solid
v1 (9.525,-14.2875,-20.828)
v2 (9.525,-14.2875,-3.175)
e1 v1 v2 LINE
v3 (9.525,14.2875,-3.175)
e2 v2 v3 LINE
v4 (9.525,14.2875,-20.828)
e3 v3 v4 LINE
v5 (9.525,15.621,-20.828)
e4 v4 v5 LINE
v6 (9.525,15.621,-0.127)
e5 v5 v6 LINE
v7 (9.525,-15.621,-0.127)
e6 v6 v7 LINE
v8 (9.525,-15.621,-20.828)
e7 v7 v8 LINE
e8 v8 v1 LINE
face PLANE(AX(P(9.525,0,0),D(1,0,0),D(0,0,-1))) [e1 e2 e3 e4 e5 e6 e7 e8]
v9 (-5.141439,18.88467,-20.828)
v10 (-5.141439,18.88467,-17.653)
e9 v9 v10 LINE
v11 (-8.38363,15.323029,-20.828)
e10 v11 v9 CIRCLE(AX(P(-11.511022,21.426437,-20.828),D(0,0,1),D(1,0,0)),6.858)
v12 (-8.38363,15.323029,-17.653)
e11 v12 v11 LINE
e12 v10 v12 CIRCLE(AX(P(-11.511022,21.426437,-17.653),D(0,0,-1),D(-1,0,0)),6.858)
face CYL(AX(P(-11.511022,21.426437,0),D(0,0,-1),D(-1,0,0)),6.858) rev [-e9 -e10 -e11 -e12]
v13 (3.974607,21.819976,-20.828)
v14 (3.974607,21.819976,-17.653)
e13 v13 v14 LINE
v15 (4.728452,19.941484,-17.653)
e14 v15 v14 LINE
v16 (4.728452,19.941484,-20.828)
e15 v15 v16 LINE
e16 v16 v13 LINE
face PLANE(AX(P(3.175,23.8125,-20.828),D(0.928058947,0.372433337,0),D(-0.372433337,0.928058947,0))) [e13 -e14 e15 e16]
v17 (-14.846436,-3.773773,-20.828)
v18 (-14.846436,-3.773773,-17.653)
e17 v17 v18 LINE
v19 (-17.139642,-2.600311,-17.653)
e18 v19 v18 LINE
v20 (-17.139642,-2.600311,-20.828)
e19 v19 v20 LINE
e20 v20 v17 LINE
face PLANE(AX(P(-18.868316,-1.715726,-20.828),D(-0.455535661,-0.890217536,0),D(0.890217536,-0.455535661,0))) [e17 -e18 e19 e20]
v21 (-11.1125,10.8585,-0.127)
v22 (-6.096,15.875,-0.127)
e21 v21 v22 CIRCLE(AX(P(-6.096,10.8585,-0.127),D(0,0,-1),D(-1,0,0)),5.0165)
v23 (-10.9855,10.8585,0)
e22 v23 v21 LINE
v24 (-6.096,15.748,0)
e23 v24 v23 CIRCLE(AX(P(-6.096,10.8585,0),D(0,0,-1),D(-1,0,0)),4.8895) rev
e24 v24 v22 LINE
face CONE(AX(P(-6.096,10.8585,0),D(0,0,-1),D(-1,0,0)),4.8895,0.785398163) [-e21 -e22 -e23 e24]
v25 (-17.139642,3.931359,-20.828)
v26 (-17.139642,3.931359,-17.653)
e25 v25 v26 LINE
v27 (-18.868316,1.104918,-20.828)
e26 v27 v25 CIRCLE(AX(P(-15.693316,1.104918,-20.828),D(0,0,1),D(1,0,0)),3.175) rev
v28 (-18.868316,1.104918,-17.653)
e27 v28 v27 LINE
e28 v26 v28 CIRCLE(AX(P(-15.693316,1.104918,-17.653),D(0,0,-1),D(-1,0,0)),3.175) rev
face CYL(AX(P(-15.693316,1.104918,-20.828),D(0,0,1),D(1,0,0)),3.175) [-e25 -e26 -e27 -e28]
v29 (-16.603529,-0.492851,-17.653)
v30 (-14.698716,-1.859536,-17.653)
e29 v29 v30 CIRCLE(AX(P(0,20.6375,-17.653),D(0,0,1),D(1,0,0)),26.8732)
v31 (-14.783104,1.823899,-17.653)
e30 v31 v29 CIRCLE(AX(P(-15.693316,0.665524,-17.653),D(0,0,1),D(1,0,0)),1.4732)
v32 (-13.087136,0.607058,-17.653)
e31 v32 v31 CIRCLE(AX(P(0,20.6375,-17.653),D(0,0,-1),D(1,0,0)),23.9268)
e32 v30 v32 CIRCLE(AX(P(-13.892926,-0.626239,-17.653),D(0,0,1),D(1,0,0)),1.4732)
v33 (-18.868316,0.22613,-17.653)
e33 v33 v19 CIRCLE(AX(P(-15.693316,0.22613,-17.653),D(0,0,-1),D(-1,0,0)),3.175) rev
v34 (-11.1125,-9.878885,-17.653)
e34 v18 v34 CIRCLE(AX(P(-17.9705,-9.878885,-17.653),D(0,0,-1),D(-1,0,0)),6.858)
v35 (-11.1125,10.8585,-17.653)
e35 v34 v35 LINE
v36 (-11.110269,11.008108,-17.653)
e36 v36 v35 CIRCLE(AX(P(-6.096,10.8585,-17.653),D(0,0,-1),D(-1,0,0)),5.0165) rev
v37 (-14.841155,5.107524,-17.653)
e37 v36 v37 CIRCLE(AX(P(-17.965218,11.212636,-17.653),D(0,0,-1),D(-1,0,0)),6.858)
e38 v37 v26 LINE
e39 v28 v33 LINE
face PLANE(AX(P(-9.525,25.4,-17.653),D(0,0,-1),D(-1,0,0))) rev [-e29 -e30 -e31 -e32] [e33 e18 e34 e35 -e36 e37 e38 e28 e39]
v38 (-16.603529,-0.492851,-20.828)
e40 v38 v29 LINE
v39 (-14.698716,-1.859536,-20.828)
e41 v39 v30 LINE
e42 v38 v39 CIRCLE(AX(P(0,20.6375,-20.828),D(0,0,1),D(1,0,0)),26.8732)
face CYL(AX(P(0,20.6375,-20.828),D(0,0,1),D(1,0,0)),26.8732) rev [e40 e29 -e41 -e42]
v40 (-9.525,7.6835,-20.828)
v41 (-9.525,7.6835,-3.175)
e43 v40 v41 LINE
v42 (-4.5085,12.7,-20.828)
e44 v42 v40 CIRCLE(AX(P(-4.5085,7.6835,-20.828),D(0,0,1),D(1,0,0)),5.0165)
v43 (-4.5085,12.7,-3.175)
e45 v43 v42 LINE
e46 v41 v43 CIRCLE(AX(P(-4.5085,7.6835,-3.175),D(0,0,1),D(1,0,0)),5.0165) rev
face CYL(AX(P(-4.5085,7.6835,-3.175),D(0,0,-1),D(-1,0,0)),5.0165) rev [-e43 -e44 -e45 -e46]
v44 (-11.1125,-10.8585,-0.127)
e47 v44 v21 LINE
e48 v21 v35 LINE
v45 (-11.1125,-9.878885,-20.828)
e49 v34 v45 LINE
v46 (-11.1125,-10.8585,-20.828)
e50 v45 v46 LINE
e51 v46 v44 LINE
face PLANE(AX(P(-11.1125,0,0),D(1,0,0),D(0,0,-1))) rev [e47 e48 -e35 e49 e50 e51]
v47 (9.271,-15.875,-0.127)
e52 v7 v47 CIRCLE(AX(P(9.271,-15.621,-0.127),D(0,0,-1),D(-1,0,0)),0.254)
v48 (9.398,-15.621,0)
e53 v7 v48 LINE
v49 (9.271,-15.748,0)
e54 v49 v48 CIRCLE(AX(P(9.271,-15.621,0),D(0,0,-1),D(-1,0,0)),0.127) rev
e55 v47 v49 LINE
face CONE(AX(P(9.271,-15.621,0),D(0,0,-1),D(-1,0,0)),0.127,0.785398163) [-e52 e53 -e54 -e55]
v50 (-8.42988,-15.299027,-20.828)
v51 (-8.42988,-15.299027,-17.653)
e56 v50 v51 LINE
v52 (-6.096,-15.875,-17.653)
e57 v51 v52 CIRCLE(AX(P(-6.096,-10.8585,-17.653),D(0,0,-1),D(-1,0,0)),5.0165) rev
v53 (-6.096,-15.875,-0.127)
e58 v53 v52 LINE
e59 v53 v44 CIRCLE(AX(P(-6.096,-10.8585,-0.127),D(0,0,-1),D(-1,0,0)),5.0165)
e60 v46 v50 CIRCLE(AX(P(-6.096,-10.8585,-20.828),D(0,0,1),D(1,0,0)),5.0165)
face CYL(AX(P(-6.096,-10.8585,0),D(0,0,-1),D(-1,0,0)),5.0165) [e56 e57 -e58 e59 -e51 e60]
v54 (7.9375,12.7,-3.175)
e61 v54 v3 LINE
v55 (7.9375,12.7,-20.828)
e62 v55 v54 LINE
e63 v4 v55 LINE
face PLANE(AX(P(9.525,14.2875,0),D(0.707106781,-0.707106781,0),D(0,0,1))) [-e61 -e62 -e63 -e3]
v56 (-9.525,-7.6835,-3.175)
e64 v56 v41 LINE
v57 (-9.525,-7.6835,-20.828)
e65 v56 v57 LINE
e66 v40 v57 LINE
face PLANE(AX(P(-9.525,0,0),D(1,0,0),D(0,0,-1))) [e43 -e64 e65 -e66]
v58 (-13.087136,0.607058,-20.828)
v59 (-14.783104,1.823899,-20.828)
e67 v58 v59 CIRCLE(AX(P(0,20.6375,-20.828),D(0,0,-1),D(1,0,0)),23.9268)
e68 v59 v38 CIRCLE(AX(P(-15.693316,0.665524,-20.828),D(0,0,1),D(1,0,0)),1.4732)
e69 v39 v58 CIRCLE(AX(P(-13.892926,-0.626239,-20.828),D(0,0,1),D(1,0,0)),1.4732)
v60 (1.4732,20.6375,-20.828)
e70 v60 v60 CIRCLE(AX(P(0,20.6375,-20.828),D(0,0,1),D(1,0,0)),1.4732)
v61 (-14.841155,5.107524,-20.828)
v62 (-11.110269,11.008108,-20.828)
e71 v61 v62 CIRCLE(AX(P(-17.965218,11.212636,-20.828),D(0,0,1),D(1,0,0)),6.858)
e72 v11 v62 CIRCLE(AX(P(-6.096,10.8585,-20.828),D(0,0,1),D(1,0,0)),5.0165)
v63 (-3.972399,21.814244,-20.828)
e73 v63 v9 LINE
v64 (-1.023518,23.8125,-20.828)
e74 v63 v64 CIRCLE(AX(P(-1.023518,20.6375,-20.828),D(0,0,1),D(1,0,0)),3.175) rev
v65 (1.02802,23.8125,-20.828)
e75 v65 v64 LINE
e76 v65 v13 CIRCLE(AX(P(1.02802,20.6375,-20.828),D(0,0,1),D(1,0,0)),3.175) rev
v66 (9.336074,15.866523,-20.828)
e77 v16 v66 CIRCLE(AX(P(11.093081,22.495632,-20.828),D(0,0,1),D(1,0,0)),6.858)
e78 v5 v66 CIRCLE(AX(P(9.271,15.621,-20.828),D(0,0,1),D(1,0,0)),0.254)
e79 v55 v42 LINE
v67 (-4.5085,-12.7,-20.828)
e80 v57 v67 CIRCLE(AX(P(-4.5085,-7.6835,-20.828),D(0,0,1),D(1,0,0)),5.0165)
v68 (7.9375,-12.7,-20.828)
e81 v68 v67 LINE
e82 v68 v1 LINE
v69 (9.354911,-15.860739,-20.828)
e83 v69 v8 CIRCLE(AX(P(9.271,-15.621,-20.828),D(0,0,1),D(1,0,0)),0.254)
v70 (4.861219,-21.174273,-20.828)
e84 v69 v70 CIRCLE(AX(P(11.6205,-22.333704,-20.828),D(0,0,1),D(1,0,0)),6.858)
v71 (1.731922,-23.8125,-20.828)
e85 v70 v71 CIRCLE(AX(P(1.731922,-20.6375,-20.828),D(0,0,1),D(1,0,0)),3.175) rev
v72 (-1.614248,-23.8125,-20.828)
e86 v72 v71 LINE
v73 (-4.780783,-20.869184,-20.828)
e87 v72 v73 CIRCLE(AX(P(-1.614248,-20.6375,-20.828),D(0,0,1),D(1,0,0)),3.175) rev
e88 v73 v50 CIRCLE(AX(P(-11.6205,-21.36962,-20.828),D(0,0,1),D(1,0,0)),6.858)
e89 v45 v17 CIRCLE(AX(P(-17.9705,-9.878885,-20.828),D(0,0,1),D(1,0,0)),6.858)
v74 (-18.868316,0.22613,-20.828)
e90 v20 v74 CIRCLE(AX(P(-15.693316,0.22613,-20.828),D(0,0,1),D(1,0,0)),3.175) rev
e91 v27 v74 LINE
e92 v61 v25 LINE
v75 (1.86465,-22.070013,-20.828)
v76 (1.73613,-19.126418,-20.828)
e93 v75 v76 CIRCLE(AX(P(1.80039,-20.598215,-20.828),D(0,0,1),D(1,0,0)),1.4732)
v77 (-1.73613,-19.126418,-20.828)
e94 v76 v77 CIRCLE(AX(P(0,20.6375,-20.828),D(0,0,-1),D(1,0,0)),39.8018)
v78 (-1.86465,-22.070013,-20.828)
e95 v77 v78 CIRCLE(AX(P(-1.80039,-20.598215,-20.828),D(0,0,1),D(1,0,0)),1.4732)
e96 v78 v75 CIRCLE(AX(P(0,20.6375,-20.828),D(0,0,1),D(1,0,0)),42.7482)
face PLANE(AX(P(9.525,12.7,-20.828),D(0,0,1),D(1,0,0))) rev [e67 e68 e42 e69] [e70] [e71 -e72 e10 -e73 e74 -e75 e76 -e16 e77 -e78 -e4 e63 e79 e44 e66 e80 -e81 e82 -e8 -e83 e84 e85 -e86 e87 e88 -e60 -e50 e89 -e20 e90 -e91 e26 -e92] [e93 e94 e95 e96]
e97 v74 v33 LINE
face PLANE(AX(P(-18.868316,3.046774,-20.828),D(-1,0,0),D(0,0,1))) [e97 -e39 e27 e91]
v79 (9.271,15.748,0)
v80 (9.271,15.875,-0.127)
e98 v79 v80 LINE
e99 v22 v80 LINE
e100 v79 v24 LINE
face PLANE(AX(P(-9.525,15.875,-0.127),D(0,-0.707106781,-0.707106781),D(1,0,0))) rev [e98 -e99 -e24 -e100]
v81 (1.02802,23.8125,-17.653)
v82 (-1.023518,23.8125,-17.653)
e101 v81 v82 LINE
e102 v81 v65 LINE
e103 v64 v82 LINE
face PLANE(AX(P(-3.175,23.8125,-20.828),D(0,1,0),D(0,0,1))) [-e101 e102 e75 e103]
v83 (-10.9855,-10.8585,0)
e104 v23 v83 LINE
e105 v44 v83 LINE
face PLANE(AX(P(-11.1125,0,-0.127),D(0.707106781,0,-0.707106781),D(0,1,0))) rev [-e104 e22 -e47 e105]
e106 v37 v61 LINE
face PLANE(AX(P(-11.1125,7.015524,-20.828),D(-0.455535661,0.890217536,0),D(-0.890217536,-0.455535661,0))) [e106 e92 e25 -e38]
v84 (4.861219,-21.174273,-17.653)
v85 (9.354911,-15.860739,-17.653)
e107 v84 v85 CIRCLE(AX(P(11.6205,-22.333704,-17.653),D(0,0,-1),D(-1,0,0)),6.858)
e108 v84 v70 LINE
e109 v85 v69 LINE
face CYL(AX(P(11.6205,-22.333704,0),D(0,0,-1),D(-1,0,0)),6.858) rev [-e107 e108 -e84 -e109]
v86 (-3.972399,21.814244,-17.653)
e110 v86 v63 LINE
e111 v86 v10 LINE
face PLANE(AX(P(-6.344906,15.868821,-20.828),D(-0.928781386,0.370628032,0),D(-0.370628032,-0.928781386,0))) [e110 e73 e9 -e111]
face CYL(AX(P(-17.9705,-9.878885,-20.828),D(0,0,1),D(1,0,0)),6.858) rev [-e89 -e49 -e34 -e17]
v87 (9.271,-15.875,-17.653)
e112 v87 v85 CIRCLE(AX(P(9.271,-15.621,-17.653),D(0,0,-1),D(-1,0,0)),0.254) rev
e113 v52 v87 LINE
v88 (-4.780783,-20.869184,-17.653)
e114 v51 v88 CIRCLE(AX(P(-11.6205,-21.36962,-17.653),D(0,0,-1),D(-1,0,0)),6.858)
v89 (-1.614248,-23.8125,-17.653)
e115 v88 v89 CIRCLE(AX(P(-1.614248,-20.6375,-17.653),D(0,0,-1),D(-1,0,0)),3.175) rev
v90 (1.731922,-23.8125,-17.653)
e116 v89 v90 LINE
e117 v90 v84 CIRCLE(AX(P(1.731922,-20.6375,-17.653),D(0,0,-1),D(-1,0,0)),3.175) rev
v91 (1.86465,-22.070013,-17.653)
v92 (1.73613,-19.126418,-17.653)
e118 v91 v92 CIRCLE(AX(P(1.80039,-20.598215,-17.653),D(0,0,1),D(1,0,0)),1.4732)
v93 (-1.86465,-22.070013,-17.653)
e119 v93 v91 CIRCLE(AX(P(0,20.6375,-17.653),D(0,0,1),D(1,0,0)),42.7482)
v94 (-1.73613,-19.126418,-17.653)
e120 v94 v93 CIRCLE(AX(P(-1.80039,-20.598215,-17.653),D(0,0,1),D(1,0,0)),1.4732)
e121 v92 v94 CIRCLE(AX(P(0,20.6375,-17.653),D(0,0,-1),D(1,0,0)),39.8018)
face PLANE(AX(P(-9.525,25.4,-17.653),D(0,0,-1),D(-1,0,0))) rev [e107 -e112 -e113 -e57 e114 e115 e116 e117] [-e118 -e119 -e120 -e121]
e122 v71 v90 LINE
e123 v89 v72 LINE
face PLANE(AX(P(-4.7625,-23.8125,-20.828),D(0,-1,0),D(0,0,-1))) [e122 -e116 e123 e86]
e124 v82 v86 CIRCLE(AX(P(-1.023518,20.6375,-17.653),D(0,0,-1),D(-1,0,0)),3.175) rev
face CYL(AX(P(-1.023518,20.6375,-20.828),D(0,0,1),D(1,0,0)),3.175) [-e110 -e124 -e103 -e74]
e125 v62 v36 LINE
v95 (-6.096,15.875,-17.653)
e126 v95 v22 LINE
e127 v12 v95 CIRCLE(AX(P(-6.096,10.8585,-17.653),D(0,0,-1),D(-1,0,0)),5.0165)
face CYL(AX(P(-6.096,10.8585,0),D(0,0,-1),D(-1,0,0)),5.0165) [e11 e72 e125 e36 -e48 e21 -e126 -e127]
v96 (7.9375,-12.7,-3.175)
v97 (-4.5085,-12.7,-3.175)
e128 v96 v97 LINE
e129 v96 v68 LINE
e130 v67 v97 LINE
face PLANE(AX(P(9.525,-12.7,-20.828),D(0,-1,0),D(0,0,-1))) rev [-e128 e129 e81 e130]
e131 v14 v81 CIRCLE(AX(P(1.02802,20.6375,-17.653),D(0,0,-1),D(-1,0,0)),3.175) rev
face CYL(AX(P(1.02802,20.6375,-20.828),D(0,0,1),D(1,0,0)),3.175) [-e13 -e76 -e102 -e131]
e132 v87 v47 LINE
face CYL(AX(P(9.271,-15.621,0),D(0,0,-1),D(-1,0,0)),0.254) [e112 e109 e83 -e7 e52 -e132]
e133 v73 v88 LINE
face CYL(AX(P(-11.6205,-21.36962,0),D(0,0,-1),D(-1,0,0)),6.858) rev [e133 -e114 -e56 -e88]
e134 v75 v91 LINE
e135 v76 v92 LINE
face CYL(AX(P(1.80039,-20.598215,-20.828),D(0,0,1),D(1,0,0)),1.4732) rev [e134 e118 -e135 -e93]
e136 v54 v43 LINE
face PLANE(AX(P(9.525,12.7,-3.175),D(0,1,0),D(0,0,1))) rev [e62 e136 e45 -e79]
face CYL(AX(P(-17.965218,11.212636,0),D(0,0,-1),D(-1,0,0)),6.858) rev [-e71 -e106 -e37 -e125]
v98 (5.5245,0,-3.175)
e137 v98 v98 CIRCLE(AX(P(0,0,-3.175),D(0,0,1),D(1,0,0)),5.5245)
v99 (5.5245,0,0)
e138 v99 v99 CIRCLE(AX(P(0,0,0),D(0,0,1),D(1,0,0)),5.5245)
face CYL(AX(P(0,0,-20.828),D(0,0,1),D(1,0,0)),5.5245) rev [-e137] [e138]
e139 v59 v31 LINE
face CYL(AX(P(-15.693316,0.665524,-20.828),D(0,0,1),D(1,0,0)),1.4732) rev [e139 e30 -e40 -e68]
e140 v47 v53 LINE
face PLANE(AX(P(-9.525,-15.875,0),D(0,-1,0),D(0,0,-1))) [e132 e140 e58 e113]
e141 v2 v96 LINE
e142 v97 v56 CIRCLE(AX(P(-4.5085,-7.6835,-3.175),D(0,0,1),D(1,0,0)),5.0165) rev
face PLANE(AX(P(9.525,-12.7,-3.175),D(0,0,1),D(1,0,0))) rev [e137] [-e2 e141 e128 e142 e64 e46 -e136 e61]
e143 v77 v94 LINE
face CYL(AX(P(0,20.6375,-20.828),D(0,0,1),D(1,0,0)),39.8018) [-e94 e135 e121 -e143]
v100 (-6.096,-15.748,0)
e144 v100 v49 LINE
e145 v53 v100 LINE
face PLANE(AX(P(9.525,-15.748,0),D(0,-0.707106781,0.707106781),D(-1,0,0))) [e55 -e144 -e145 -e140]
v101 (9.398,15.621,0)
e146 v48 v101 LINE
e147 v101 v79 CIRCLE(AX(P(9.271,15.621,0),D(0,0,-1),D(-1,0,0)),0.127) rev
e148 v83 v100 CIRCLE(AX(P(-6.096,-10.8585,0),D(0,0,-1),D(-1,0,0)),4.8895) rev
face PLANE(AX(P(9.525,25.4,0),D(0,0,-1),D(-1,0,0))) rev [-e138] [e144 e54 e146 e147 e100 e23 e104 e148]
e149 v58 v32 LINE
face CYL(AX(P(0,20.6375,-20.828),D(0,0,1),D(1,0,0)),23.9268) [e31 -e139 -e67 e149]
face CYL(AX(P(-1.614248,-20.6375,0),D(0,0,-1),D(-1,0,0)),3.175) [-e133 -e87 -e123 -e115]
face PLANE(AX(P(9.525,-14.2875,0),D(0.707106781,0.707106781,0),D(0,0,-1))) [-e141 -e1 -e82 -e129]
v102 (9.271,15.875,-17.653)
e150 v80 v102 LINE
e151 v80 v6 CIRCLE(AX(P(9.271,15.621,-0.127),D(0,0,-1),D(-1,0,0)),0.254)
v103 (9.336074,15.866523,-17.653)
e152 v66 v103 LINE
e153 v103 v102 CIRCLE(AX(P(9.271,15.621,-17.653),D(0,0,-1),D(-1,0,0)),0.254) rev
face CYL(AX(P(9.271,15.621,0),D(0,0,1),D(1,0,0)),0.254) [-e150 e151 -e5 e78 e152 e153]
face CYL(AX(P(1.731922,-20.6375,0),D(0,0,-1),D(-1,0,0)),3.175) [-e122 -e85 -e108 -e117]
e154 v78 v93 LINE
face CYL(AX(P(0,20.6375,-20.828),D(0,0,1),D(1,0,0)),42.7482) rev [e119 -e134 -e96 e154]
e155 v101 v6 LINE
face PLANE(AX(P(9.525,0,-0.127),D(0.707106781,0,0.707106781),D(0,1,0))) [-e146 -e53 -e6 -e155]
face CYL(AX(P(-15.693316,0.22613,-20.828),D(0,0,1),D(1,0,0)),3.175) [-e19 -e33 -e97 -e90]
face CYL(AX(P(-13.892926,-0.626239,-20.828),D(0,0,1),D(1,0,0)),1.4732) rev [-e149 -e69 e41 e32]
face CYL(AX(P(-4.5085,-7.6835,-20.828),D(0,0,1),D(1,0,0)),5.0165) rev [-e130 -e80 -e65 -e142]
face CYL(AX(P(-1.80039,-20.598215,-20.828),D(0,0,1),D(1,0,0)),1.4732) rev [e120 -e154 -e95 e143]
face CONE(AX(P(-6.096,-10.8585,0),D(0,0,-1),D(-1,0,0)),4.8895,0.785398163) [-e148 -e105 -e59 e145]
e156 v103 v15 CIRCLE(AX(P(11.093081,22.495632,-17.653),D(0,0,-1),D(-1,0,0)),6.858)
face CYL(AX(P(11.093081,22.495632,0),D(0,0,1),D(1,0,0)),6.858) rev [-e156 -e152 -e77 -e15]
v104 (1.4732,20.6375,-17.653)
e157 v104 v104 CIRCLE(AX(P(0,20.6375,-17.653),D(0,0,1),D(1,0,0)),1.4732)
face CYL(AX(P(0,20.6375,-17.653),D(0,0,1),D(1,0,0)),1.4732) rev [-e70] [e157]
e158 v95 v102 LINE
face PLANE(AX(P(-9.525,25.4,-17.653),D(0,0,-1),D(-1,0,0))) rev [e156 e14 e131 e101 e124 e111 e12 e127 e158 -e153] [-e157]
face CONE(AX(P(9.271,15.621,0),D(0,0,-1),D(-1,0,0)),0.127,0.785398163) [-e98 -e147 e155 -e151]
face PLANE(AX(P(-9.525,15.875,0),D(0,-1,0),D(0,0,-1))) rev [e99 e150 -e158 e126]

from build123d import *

# Parameters (mm, degrees)
BOSS_EXTRUDE1_DEPTH   = 9.525
SKETCH2_R             = 5.5245
CUT_EXTRUDE1_DEPTH    = 35.200748661
SKETCH11_W            = 17.653
SKETCH11_H            = 9.525
CUT_EXTRUDE4_DEPTH    = 38.971938112
F_4_CLEARANCE_HOLE1_D = 2.9464
CUT_EXTRUDE5_DEPTH    = 33.365321472
BOSS_EXTRUDE2_DEPTH   = 1.5875
SKETCH16_W            = 9.525
SKETCH16_H            = 50.8
BOSS_EXTRUDE3_DEPTH   = 3.175
FILLET1_R             = 5.0165
CUT_EXTRUDE6_DEPTH    = 38.184604546
FILLET3_R             = 0.254
CHAMFER1_SIZE         = 0.127
CHAMFER2_SIZE         = 1.5875
SKETCH18_OUTSIDE_W    = 44.691
SKETCH18_OUTSIDE_H    = 65.328
CUT_EXTRUDE7_DEPTH    = 38.184604546
FILLET5_START         = -20.828
FILLET5_DEPTH         = 3.175
FILLET6_R             = 3.175


with BuildPart() as part:
    # Sketch1 → Boss-Extrude1 (new, symmetric)
    with BuildSketch(Plane(origin=(0, 0, 0), x_dir=(0, 0, -1), z_dir=(1, 0, 0))):
        Polygon((0, 25.4), (0, -25.4), (20.828, -25.4), (20.828, -12.7), (3.175, -12.7), (3.175, 12.7), (20.828, 12.7), (20.828, 25.4), align=None)
    extrude(amount=BOSS_EXTRUDE1_DEPTH, both=True)

    # Sketch2 → Cut-Extrude1 (cut, through all)
    with BuildSketch(Plane.XY):
        Circle(SKETCH2_R)
    extrude(amount=-CUT_EXTRUDE1_DEPTH, mode=Mode.SUBTRACT)

    # Sketch11 → Cut-Extrude4 (cut, through all)
    with BuildSketch(Plane(origin=(9.525, 0, 0), x_dir=(0, 0, -1), z_dir=(1, 0, 0))):
        with Locations((8.8265, 20.6375)):
            Rectangle(SKETCH11_W, SKETCH11_H)
    cut_extrude4 = extrude(amount=-CUT_EXTRUDE4_DEPTH, mode=Mode.SUBTRACT)

    # #4 Clearance Hole1 (through all)
    with Locations(Plane.XY.offset(-17.653)):
        with Locations((0, 20.6375)):
            Hole(F_4_CLEARANCE_HOLE1_D / 2)

    # Mirror1: Cut-Extrude4 across plane
    add(cut_extrude4.mirror(Plane.ZX), mode=Mode.SUBTRACT)

    # Sketch14 → Cut-Extrude5 (cut, through all)
    with BuildSketch(Plane.XY.offset(-17.653)):
        with BuildLine():
            ThreePointArc((-1.864650295, -22.070013186), (0, -22.1107), (1.864650295, -22.070013186))
            ThreePointArc((1.864650295, -22.070013186), (3.272188054, -20.533955264), (1.736130132, -19.126417506))
            ThreePointArc((1.736130132, -19.126417506), (0, -19.1643), (-1.736130132, -19.126417506))
            ThreePointArc((-1.736130132, -19.126417506), (-3.272188054, -20.533955264), (-1.864650295, -22.070013186))
        make_face()
    extrude(amount=-CUT_EXTRUDE5_DEPTH, mode=Mode.SUBTRACT)

    # Sketch15 → Boss-Extrude2 (add)
    with BuildSketch(Plane.ZY.offset(9.525)):
        Polygon((-20.828, 12.7), (-20.828, 25.4), (-17.653, 25.4), (-17.653, 15.875), (0, 15.875), (0, -15.875), (-17.653, -15.875), (-17.653, -25.4), (-20.828, -25.4), (-20.828, -12.7), align=None)
    extrude(amount=BOSS_EXTRUDE2_DEPTH)

    # Sketch16 → Boss-Extrude3 (add)
    with BuildSketch(Plane.XY.offset(-17.653)):
        with Locations((-15.875, 0)):
            Rectangle(SKETCH16_W, SKETCH16_H)
    extrude(amount=-BOSS_EXTRUDE3_DEPTH)

    # Fillet1
    fillet1_edges = [part.edges().sort_by_distance(p)[0] for p in [
        (-9.525, 12.7, -12.0015),
        (-11.1125, -15.875, -8.8265),
        (-11.1125, 15.875, -8.8265),
        (-9.525, -12.7, -12.0015),
    ]]
    fillet(fillet1_edges, radius=FILLET1_R)

    # Sketch17 → Cut-Extrude6 (cut, through all)
    with BuildSketch(Plane.XY.offset(-17.653)):
        with BuildLine():
            ThreePointArc((-16.603528504, -0.49285067), (-15.666032673, -1.196975), (-14.698715658, -1.859536166))
            ThreePointArc((-14.698715658, -1.859536166), (-12.659629074, -1.432028992), (-13.087136248, 0.607057592))
            ThreePointArc((-13.087136248, 0.607057592), (-13.94839582, 1.196975), (-14.783103829, 1.823898553))
            ThreePointArc((-14.783103829, 1.823898553), (-16.851690778, 1.575736279), (-16.603528504, -0.49285067))
        make_face()
    extrude(amount=-CUT_EXTRUDE6_DEPTH, mode=Mode.SUBTRACT)

    # Fillet3
    fillet3_edges = [part.edges().sort_by_distance(p)[0] for p in [
        (9.525, 15.875, -8.8265),
        (9.525, -15.875, -8.8265),
    ]]
    fillet(fillet3_edges, radius=FILLET3_R)

    # Chamfer1
    chamfer1_edges = [part.edges().sort_by_distance(p)[0] for p in [
        (-11.1125, 0, 0),
        (1.5875, 15.875, 0),
        (1.5875, -15.875, 0),
        (-9.643201168, -14.405701168, 0),
        (-9.643201168, 14.405701168, 0),
        (9.525, 0, 0),
        (9.450605122, -15.800605122, 0),
        (9.450605122, 15.800605122, 0),
    ]]
    chamfer(chamfer1_edges, length=CHAMFER1_SIZE)

    # Chamfer2
    chamfer2_edges = [part.edges().sort_by_distance(p)[0] for p in [
        (9.525, -12.7, -12.0015),
        (9.525, 12.7, -12.0015),
    ]]
    chamfer(chamfer2_edges, length=CHAMFER2_SIZE)

    # Sketch18 outside → Cut-Extrude7 (cut, through all)
    with BuildSketch(Plane.XY.offset(-17.653)):
        with Locations((-5.5565, 0)):
            Rectangle(SKETCH18_OUTSIDE_W, SKETCH18_OUTSIDE_H)
        with BuildLine():
            Line((9.525, 15.621), (9.525, -15.621))
            ThreePointArc((9.525, -15.621), (9.450605122, -15.800605122), (9.271, -15.875))
            Line((9.271, -15.875), (4.7625, -15.875))
            Line((4.7625, -15.875), (4.7625, -23.8125))
            Line((4.7625, -23.8125), (-4.7625, -23.8125))
            Line((-4.7625, -23.8125), (-4.7625, -15.875))
            Line((-4.7625, -15.875), (-6.096, -15.875))
            ThreePointArc((-6.096, -15.875), (-9.643201168, -14.405701168), (-11.1125, -10.8585))
            Line((-11.1125, -10.8585), (-11.1125, -5.684476059))
            Line((-11.1125, -5.684476059), (-18.868316167, -1.715726059))
            Line((-18.868316167, -1.715726059), (-18.868316167, 3.046773941))
            Line((-18.868316167, 3.046773941), (-11.1125, 7.015523941))
            Line((-11.1125, 7.015523941), (-11.1125, 10.8585))
            ThreePointArc((-11.1125, 10.8585), (-9.730137534, 14.316579906), (-6.344906405, 15.868821133))
            Line((-6.344906405, 15.868821133), (-3.175, 23.8125))
            Line((-3.175, 23.8125), (3.175, 23.8125))
            Line((3.175, 23.8125), (6.360346812, 15.875))
            Line((6.360346812, 15.875), (9.271, 15.875))
            ThreePointArc((9.271, 15.875), (9.450605122, 15.800605122), (9.525, 15.621))
        make_face(mode=Mode.SUBTRACT)
    extrude(amount=-CUT_EXTRUDE7_DEPTH, mode=Mode.SUBTRACT)

    # Fillet5: read off the stored shape, not the designer's step
    # Fillet5 outline → Fillet5 (add)
    with BuildSketch(Plane.XY.offset(FILLET5_START)):
        with BuildLine():
            Line((-6.344906405, 15.868821133), (-5.141439076, 18.884669795))
            ThreePointArc((-5.141439076, 18.884669795), (-6.439586705, 16.809867774), (-8.383629538, 15.323029465))
            ThreePointArc((-8.383629538, 15.323029465), (-7.393295565, 15.704353533), (-6.344906405, 15.868821133))
        make_face()
        with BuildLine():
            Line((4.728452297, 19.941484272), (6.360346812, 15.875))
            Line((6.360346812, 15.875), (9.271, 15.875))
            ThreePointArc((9.271, 15.875), (9.303812086, 15.872871727), (9.336074306, 15.866522574))
            ThreePointArc((9.336074306, 15.866522574), (6.549781647, 17.358453978), (4.728452297, 19.941484272))
        make_face()
        with BuildLine():
            Line((9.271, -15.875), (4.7625, -15.875))
            Line((4.7625, -15.875), (4.7625, -22.333703908))
            ThreePointArc((4.7625, -22.333703908), (6.027219419, -18.365407505), (9.354910714, -15.860739425))
            ThreePointArc((9.354910714, -15.860739425), (9.313556938, -15.871409478), (9.271, -15.875))
        make_face()
        with BuildLine():
            ThreePointArc((-6.096, -15.875), (-7.297950449, -15.728878565), (-8.429879679, -15.299026759))
            ThreePointArc((-8.429879679, -15.299026759), (-5.750515411, -17.823432924), (-4.7625, -21.369620302))
            Line((-4.7625, -21.369620302), (-4.7625, -15.875))
            Line((-4.7625, -15.875), (-6.096, -15.875))
        make_face()
        with BuildLine():
            Line((-11.1125, -9.878885048), (-11.1125, -5.684476059))
            Line((-11.1125, -5.684476059), (-14.846436435, -3.773773186))
            ThreePointArc((-14.846436435, -3.773773186), (-12.119987547, -6.300663697), (-11.1125, -9.878885048))
        make_face()
        with BuildLine():
            ThreePointArc((-11.1125, 10.8585), (-11.11194212, 10.933312395), (-11.110268606, 11.008108151))
            ThreePointArc((-11.110268606, 11.008108151), (-12.168719233, 7.547562085), (-14.841154527, 5.107523888))
            Line((-14.841154527, 5.107523888), (-11.1125, 7.015523941))
            Line((-11.1125, 7.015523941), (-11.1125, 10.8585))
        make_face()
    extrude(amount=FILLET5_DEPTH)

    # Fillet6
    fillet6_edges = [part.edges().sort_by_distance(p)[0] for p in [
        (-3.175, 23.8125, -19.2405),
        (3.175, 23.8125, -19.2405),
        (4.7625, -23.8125, -19.2405),
        (-4.7625, -23.8125, -19.2405),
        (-18.868316167, 3.046773941, -19.2405),
        (-18.868316167, -1.715726059, -19.2405),
    ]]
    fillet(fillet6_edges, radius=FILLET6_R)


solid = part.part
